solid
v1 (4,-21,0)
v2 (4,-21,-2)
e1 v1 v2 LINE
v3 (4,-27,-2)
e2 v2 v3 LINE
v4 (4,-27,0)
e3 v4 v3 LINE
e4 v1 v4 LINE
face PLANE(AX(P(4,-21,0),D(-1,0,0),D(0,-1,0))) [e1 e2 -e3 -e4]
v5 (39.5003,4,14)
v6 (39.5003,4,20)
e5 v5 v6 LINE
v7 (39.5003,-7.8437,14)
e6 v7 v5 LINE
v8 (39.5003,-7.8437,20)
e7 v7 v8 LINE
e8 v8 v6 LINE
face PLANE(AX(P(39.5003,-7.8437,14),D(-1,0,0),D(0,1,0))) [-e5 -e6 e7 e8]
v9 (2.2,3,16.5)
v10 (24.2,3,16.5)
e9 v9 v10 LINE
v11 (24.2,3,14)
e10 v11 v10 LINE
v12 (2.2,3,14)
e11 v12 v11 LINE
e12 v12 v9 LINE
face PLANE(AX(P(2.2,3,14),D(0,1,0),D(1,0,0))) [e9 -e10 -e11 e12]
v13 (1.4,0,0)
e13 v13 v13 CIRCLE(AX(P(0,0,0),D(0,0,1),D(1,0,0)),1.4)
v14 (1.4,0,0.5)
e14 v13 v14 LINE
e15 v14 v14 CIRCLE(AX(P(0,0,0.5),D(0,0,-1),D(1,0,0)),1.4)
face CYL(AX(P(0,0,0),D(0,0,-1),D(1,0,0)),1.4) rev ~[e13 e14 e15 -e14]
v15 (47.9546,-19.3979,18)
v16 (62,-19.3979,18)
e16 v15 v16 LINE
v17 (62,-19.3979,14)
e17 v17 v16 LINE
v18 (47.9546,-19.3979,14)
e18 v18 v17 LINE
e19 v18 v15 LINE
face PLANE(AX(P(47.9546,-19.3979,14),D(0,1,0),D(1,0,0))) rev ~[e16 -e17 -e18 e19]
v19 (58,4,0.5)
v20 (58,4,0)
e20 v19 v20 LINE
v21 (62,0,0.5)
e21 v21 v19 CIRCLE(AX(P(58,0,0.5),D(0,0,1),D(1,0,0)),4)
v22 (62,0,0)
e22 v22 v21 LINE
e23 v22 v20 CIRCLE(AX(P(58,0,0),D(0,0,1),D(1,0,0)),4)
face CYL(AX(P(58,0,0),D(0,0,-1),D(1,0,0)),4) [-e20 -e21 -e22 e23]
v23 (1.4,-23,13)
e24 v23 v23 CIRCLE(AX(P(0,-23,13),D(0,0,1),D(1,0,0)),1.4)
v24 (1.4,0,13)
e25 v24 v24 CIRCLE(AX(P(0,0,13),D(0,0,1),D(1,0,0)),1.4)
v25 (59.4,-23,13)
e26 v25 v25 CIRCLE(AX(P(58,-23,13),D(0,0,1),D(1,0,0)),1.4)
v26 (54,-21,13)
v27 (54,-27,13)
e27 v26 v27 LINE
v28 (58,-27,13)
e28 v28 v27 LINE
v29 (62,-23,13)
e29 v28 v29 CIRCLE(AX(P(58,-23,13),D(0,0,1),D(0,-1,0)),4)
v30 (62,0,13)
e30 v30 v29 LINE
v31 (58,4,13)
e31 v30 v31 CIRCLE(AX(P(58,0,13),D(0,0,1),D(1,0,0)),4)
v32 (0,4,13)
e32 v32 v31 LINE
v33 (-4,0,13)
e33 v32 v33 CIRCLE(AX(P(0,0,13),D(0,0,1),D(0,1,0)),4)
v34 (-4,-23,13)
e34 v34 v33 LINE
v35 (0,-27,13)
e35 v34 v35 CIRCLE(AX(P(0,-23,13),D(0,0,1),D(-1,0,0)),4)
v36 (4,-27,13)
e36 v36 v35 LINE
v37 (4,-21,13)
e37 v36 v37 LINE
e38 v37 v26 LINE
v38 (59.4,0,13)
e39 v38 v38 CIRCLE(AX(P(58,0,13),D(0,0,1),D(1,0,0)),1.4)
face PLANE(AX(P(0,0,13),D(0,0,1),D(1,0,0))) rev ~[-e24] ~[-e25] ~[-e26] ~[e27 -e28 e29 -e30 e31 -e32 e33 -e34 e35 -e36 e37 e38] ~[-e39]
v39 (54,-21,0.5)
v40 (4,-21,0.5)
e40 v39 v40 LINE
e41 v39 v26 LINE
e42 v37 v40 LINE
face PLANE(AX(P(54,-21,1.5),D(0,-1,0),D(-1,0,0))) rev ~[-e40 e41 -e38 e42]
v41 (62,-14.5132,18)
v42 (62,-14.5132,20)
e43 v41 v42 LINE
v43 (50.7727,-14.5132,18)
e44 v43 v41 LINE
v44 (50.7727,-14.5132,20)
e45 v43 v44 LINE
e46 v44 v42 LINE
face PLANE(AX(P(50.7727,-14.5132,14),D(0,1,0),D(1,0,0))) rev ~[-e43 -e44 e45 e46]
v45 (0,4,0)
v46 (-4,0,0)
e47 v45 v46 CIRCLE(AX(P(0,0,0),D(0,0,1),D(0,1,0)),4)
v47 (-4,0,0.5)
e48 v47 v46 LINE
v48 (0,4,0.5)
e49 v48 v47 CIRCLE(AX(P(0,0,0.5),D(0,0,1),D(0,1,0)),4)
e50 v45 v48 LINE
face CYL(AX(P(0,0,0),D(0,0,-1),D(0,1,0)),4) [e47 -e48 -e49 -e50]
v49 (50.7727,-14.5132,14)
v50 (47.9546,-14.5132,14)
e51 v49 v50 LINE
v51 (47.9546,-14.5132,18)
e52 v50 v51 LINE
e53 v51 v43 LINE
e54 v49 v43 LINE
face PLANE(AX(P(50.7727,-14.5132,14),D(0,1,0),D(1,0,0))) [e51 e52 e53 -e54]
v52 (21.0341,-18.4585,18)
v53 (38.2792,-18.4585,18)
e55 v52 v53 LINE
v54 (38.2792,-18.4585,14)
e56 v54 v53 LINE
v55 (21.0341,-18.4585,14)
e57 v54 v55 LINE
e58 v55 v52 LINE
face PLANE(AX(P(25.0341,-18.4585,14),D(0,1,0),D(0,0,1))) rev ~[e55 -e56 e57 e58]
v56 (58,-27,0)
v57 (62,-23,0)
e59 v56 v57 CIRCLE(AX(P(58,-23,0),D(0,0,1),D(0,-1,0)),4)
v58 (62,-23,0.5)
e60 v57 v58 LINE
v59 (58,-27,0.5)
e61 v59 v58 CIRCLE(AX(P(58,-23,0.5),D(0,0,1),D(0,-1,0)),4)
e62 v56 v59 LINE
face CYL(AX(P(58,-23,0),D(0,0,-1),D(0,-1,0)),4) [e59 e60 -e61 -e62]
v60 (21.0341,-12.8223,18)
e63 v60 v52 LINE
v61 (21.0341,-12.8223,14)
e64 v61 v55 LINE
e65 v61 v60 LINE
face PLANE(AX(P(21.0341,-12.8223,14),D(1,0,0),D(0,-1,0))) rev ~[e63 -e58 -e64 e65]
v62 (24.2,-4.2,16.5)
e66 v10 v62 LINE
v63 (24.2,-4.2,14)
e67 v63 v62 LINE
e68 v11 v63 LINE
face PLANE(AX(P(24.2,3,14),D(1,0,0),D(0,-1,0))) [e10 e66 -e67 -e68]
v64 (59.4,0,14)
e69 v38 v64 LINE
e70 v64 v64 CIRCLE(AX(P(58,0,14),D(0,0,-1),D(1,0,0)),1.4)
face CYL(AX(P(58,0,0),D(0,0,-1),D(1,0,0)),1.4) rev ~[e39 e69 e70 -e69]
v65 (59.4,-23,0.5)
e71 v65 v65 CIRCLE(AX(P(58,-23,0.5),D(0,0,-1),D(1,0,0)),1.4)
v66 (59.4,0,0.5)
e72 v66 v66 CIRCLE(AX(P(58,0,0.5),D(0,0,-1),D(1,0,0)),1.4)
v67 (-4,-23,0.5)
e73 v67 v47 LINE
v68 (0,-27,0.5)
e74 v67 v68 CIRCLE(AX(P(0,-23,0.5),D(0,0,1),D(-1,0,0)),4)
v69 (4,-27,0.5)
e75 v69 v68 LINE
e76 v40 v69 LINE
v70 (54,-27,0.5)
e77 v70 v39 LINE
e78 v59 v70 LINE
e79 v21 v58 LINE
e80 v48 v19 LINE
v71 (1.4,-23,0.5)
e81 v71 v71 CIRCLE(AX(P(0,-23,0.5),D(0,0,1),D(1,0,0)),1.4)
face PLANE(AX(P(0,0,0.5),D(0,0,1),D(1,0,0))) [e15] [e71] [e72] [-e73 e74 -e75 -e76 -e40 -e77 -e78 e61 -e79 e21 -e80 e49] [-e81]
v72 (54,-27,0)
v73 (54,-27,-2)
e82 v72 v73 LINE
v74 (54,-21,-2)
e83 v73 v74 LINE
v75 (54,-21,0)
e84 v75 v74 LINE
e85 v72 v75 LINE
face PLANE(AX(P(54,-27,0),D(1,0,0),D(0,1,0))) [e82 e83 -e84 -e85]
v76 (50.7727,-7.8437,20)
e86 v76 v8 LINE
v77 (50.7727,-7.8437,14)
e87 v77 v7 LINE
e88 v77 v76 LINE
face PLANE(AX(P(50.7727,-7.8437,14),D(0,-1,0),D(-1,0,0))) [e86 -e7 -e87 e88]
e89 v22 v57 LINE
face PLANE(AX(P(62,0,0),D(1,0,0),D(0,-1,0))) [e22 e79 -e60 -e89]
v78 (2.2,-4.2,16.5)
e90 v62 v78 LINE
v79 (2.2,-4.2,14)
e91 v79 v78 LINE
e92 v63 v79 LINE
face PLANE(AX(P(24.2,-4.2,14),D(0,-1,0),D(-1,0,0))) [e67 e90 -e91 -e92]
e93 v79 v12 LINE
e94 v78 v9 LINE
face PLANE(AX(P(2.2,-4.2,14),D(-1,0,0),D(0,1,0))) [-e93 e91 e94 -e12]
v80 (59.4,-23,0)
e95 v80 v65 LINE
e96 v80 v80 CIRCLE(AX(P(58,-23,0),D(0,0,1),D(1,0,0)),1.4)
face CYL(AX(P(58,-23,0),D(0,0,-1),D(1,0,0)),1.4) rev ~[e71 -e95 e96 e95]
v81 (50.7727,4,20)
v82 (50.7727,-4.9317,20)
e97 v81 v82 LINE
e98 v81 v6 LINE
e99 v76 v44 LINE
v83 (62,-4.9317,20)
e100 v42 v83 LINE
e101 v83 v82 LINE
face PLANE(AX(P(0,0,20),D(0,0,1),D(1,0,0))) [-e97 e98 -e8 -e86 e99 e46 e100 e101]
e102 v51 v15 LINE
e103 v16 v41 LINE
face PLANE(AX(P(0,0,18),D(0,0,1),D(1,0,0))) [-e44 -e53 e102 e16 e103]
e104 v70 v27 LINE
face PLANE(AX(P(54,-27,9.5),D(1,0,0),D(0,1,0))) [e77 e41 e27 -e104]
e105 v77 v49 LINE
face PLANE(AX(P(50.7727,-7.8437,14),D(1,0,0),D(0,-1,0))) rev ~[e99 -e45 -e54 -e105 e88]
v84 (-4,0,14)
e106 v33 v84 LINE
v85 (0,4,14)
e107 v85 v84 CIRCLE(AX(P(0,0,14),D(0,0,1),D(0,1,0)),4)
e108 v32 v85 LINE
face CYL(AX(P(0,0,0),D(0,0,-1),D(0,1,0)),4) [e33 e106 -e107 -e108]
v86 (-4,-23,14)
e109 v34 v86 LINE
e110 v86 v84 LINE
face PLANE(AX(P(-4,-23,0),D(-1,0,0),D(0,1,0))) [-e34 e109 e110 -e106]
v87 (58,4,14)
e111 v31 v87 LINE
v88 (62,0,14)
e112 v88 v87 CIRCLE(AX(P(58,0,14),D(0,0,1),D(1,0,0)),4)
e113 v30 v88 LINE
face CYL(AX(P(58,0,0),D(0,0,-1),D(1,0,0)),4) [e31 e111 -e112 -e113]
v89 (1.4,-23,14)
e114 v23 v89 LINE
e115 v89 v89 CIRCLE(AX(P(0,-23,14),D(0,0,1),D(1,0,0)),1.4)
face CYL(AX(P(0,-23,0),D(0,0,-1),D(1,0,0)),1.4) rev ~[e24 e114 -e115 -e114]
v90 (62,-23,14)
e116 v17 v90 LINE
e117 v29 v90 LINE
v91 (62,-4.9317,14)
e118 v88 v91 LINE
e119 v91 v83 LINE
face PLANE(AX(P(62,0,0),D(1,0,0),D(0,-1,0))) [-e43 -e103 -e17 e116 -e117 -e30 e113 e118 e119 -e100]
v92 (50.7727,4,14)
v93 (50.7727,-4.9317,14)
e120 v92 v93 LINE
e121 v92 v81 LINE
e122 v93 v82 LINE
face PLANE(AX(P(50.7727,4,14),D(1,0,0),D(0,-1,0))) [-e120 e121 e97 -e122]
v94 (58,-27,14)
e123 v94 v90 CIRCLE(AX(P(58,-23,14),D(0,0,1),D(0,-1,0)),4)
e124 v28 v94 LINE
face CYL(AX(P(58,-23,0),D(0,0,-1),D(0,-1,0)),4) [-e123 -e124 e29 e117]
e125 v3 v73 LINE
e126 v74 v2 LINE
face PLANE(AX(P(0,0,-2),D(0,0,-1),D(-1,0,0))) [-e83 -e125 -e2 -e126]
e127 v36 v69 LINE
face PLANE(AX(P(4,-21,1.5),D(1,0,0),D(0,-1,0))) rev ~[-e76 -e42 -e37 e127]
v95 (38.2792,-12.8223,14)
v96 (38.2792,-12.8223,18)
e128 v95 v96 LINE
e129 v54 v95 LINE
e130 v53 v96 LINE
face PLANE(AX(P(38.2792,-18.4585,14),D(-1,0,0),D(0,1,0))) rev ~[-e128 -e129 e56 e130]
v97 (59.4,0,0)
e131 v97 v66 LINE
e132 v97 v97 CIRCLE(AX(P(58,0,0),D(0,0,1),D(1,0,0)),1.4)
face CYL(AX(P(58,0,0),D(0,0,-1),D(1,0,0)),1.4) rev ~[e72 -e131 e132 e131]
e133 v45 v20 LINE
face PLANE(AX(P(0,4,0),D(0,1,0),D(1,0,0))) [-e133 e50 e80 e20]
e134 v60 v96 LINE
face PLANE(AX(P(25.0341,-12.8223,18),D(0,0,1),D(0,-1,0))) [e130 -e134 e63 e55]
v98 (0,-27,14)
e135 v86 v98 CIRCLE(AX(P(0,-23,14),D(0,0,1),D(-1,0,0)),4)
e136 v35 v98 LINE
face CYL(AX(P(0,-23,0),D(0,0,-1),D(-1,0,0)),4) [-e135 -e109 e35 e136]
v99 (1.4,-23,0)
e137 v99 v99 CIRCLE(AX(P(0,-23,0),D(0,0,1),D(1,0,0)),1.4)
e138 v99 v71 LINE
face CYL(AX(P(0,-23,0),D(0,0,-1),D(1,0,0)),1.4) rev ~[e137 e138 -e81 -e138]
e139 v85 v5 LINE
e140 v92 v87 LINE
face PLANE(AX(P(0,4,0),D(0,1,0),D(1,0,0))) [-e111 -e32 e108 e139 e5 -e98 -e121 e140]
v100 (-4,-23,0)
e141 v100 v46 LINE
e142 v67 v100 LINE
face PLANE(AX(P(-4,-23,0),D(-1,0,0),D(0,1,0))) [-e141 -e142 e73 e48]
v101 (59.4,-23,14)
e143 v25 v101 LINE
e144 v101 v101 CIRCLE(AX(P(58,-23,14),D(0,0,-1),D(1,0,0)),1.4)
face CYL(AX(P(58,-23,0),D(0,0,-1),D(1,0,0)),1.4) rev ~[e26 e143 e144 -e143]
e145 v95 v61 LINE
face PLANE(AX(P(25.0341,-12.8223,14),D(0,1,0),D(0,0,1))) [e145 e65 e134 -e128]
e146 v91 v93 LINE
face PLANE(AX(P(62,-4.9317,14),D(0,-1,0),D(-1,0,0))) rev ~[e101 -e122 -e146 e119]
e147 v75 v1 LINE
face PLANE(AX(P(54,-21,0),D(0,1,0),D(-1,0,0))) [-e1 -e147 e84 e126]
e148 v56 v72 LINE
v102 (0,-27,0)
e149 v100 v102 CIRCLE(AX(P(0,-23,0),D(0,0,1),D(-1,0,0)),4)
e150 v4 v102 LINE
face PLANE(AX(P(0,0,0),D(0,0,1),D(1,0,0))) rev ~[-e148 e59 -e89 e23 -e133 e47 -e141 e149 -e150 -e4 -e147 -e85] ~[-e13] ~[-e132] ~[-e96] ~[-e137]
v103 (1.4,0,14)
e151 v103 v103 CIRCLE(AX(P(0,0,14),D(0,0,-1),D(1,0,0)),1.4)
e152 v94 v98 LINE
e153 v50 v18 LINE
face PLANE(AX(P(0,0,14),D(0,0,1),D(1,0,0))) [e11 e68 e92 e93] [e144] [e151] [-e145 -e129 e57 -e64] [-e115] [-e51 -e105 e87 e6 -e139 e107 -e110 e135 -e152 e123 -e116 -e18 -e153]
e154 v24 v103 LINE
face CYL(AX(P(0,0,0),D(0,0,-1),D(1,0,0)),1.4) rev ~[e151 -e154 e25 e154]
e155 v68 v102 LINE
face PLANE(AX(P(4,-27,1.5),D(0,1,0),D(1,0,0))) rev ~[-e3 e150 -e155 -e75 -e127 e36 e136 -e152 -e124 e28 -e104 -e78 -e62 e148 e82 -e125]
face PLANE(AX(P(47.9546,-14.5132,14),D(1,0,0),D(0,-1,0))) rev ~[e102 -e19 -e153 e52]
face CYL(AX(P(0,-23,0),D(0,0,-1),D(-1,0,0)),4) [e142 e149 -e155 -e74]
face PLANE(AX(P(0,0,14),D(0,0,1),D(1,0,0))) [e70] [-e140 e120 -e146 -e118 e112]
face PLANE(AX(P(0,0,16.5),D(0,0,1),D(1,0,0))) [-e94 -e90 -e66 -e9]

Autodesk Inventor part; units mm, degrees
ref_plane "YZ Plane" through (0, 0, 0) normal (1, 0, 0) x (0, 1, 0)
ref_plane "XZ Plane" through (0, 0, 0) normal (0, 1, 0) x (-1, 0, 0)
ref_plane "XY Plane" through (0, 0, 0) normal (0, 0, 1) x (1, 0, 0)
sketch "스케치1" plane through (0, 0, 0) normal (0, 0, 1) x (1, 0, 0)
  circle A0 centre (0, 0) radius 1.4
  line L0 (0, 0) -> (58, 0)
  line L1 (58, 0) -> (58, -23)
  circle A1 centre (58, 0) radius 1.4
  circle A2 centre (0, -23) radius 1.4
  circle A3 centre (58, -23) radius 1.4
  line L2 (0, 0) -> (0, 4)
  line L3 (0, 4) -> (-4, 4)
  line L4 (0, 4) -> (58, 4)
  line L5 (62, 0) -> (62, -23)
  line L6 (58, -27) -> (0, -27)
  line L7 (-4, -23) -> (-4, 0)
  arc A4 (0, 4) -> (-4, 0) centre (0, 0) ccw
  arc A5 (62, 0) -> (58, 4) centre (58, 0) ccw
  arc A6 (58, -27) -> (62, -23) centre (58, -23) ccw
  arc A7 (-4, -23) -> (0, -27) centre (0, -23) ccw
  point P0 (62, -27)
  point P1 (62, 4)
  point P2 (-4, -27)
  dimension "d0" = 2.8
  dimension "d1" = 58
  dimension "d2" = 23
  dimension "d5" = 58
  dimension "d8" = 23
  dimension "d11" = 4
  dimension "d12" = 4
  dimension "d13" = 66
  dimension "d14" = 31
  dimension "d21" = 4
extrude "돌출1" add sketch "스케치1" along normal blind 14
extrude "돌출2" cut sketch "스케치1" along normal blind 13
extrude "돌출3" add sketch "스케치1" along normal blind 1.5
sketch "스케치2" plane through (0, 0, 14) normal (0, 0, 1) x (1, 0, 0)
  line L0 (58, 4) -> (0, 4) projected
  line L1 (39.5003, 4) -> (50.7727, 4)
  line L2 (50.7727, 4) -> (50.7727, -7.8437)
  line L3 (50.7727, -7.8437) -> (39.5003, -7.8437)
  line L4 (39.5003, -7.8437) -> (39.5003, 4)
  line L5 (62, -23) -> (62, 0) projected
  line L6 (62, -4.9317) -> (50.7727, -4.9317)
  line L7 (50.7727, -4.9317) -> (50.7727, -14.5132)
  line L8 (50.7727, -14.5132) -> (62, -14.5132)
  line L9 (62, -14.5132) -> (62, -4.9317)
  line L10 (62, -14.5132) -> (47.9546, -14.5132)
  line L11 (47.9546, -14.5132) -> (47.9546, -19.3979)
  line L12 (47.9546, -19.3979) -> (62, -19.3979)
  line L13 (62, -19.3979) -> (62, -14.5132)
  line L14 (38.2792, -12.8223) -> (25.0341, -12.8223)
  line L15 (25.0341, -12.8223) -> (25.0341, -18.4585)
  line L16 (25.0341, -18.4585) -> (38.2792, -18.4585)
  line L17 (38.2792, -18.4585) -> (38.2792, -12.8223)
  point P0 (0, 0)
  point P1 (50.7727, -7.8437)
extrude "돌출4" add sketch "스케치2" along normal blind 6 contours L2 L3 L4 L0 | L6 L5 L8 L7 L2
extrude "돌출5" add sketch "스케치2" along normal blind 4 contours L8 L5 L12 L11 L10 | L17 L16 L15 L14
sketch "스케치3" plane through (0, 0, 1.5) normal (0, 0, 1) x (1, 0, 0)
  line L0 (0, -27) -> (58, -27) projected
  line L1 (29, -27) -> (4, -27)
  line L2 (4, -27) -> (54, -27)
  line L3 (54, -27) -> (54, -21)
  line L4 (54, -21) -> (4, -21)
  line L5 (4, -21) -> (4, -27)
  point P0 (0, 0)
  dimension "d26" = 25
  dimension "d27" = 50
  dimension "d28" = 6
extrude "돌출6" add sketch "스케치3" along normal blind 12.25
extrude "돌출7" add sketch "스케치1" along normal blind 9.5
sketch "스케치4" plane through (0, 0, 0) normal (0, 0, -1) x (-1, 0, 0)
  line L0 (-4, -21) -> (-4, -27) projected
  line L1 (-4, -21) -> (-4, -27) projected
  line L2 (-54, -27) -> (-54, -21) projected
  line L3 (-54, -27) -> (-54, -21) projected
  line L4 (-54, -21) -> (-4, -21) projected
  line L5 (-54, -21) -> (-4, -21)
  line L6 (-4, -21) -> (-4, -27)
  line L7 (-4, -27) -> (-54, -27)
  line L8 (-54, -27) -> (-54, -21)
  point P0 (0, 0)
extrude "돌출8" add sketch "스케치4" along normal blind 2
sketch "스케치5" plane through (0, 0, 14) normal (0, 0, 1) x (1, 0, 0)
  circle A0 centre (0, 0) radius 2.2
  line L0 (2.2, 0) -> (2.2, 3)
  line L1 (58, 4) -> (0, 4) projected
  line L2 (2.2, 3) -> (24.2, 3)
  line L3 (24.2, 3) -> (24.2, -4.2)
  line L4 (24.2, -4.2) -> (2.2, -4.2)
  line L5 (2.2, -4.2) -> (2.2, 3)
  dimension "d35" = 4.4
  dimension "d36" = 3
  dimension "d37" = 22
  dimension "d38" = 7.2
extrude "돌출9" add sketch "스케치5" along normal blind 2.5 contours L0 L2 L3 L4 L5
move faces "이동1" translate (-4, 0, 0) faces at (25.0341, -14.7011, 15.3333)
move faces "이동2" translate (0, 0, -9) faces at (37.3333, -7.2234, 9.5)
properties part number "라파+hat"
